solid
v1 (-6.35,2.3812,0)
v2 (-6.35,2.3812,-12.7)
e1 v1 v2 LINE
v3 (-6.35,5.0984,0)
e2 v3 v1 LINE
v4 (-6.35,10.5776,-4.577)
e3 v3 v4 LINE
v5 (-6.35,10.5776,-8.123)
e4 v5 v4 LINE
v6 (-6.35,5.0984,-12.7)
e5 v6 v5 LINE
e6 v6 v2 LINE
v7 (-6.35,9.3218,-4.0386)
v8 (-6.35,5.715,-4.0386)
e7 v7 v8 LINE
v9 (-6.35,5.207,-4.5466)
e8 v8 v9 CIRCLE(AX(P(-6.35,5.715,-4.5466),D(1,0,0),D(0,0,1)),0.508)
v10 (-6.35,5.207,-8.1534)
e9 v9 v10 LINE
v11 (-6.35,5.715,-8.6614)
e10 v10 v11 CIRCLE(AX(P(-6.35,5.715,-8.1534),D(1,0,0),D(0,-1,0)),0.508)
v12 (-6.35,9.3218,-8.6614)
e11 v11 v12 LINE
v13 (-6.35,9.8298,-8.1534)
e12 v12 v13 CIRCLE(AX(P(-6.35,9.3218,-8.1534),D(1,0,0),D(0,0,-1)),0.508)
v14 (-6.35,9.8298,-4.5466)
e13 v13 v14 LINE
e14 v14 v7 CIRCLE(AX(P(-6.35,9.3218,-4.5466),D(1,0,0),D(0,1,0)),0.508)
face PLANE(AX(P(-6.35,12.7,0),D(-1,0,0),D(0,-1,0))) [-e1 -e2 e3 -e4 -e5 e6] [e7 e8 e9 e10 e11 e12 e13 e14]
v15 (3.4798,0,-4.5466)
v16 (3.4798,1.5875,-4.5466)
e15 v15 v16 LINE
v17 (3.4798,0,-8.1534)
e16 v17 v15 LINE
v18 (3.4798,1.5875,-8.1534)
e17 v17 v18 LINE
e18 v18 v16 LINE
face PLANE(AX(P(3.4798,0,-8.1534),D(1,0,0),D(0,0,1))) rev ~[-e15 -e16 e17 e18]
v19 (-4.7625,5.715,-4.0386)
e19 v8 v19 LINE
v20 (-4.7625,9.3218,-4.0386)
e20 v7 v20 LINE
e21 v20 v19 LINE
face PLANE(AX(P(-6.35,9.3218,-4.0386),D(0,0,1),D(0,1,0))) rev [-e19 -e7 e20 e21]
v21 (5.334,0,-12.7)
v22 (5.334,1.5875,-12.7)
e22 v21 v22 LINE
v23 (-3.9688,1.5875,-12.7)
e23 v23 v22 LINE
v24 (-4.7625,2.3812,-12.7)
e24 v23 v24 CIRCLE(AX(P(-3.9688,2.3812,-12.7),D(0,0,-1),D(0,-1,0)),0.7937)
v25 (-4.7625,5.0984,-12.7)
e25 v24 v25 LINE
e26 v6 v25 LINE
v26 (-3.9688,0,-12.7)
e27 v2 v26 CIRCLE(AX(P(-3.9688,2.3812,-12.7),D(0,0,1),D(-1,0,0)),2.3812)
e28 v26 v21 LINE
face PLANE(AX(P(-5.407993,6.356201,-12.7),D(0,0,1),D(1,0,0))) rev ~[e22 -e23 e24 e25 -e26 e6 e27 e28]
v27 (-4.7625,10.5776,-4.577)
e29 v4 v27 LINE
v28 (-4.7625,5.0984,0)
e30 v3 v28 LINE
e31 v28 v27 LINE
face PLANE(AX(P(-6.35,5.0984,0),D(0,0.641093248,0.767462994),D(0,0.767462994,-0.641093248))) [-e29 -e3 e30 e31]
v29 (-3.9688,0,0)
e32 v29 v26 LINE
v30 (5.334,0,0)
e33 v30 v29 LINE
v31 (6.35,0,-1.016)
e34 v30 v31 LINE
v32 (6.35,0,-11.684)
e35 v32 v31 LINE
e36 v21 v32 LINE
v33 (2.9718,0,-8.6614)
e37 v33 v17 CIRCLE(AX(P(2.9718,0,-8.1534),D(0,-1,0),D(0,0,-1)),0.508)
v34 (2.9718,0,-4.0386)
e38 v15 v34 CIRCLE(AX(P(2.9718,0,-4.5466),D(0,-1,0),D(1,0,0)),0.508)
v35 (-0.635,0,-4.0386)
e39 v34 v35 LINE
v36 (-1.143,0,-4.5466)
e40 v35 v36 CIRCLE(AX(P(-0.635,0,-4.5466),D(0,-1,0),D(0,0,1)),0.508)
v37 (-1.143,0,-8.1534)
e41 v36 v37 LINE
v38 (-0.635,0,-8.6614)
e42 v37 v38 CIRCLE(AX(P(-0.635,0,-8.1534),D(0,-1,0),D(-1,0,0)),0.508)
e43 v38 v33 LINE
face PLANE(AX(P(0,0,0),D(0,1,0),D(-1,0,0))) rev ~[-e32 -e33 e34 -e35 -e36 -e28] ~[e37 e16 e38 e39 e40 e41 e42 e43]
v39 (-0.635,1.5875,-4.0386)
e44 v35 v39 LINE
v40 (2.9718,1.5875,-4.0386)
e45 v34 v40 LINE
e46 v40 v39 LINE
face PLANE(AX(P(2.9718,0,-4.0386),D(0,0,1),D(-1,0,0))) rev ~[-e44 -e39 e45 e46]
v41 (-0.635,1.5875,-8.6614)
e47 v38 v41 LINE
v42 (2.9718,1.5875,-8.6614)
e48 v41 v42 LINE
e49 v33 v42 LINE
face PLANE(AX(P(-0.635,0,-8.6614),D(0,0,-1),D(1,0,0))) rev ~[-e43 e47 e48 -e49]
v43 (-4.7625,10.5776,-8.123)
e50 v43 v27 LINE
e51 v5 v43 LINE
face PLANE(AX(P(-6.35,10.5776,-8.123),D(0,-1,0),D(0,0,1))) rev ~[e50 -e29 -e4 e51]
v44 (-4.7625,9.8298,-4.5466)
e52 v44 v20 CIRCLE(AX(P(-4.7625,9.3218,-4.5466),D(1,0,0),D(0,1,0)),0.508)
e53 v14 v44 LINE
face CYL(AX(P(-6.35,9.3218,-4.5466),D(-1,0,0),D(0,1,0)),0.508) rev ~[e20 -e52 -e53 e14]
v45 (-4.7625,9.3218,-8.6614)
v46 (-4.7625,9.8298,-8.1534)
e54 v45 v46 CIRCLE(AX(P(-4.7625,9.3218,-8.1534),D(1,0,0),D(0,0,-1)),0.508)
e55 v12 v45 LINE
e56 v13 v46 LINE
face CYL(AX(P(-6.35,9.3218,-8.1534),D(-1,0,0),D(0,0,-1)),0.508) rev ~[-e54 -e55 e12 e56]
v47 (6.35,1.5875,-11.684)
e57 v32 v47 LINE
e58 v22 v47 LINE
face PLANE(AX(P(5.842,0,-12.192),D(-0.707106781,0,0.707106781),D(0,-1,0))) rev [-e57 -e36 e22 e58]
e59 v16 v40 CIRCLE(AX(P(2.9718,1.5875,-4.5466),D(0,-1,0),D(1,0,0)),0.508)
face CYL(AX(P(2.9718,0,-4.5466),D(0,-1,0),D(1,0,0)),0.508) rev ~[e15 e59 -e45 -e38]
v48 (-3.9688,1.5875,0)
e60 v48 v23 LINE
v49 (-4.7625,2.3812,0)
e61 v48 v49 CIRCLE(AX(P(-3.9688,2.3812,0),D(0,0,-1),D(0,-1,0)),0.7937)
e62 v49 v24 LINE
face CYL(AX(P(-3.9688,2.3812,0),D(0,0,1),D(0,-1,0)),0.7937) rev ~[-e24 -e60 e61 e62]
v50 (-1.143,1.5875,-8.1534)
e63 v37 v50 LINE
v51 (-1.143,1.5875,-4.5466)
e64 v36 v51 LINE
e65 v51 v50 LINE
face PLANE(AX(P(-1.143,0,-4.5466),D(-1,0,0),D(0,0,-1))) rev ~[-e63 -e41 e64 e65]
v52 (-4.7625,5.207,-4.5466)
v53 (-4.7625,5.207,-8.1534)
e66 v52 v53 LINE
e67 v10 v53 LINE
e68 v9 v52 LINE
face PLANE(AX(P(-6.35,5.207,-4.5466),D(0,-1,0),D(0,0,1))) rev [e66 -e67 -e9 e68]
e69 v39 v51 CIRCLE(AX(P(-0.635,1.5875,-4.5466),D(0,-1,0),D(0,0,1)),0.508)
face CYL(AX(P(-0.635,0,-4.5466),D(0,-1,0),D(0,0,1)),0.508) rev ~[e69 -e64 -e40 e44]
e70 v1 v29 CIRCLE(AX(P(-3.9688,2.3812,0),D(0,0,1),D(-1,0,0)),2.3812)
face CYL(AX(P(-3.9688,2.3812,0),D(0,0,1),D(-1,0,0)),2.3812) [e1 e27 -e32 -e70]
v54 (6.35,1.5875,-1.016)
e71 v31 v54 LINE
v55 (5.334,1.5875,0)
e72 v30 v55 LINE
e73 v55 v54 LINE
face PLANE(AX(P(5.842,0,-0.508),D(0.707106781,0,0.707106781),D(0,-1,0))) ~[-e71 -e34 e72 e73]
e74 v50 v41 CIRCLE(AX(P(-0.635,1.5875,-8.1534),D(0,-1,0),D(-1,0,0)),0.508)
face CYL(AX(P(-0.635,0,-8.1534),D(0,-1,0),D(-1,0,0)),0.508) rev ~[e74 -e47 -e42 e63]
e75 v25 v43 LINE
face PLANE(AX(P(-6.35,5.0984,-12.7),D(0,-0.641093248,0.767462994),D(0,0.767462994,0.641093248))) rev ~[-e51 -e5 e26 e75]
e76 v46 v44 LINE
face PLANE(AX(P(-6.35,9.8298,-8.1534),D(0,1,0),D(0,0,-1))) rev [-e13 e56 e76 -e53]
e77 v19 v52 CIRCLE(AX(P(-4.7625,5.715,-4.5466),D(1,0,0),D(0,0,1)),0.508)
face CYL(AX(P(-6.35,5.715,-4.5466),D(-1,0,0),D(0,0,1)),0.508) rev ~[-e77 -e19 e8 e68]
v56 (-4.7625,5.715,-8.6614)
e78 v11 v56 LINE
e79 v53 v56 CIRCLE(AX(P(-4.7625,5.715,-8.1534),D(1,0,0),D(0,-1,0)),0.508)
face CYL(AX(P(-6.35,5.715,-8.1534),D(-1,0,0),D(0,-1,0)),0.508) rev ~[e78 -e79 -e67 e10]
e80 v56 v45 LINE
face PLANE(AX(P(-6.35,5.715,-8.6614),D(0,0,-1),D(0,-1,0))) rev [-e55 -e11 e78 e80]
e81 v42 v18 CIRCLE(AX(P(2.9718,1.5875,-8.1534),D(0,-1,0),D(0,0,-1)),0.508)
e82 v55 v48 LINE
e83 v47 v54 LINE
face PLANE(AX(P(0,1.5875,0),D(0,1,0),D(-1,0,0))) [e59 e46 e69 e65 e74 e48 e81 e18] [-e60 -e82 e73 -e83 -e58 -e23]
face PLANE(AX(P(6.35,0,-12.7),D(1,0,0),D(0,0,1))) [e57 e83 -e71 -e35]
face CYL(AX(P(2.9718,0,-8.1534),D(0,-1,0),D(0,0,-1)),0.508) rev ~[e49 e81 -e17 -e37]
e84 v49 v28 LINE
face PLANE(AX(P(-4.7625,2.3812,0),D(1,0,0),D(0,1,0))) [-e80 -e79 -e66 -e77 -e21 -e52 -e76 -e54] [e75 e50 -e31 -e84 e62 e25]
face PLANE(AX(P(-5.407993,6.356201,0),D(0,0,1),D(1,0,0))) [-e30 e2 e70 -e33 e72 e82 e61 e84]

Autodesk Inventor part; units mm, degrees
ref_plane "YZ Plane" through (0, 0, 0) normal (1, 0, 0) x (0, 1, 0)
ref_plane "XZ Plane" through (0, 0, 0) normal (0, 1, 0) x (-1, 0, 0)
sketch "Sketch1" plane through (0, 0, 0) normal (0, 1, 0) x (-1, 0, 0)
  line L0 (-6.35, 0) -> (6.35, 0)
  line L1 (6.35, 0) -> (6.35, -12.7)
  line L2 (6.35, -12.7) -> (-6.35, -12.7)
  line L3 (-6.35, -12.7) -> (-6.35, 0)
  line L4 (6.35, 0) -> (-6.35, -12.7) construction
  point P0 (0, 0)
  point P1 (0, 0)
  dimension "d0" = 12.7
  dimension "d1" = 12.7
extrude "Plate1" add sketch "Sketch1" along normal blind 1.5875
sketch "Sketch2" plane through (-4.7625, 0, 0) normal (-1, 0, 0) x (0, -1, 0)
  line L0 (0, -12.7) -> (0, 0)
  line L1 (0, 0) -> (-12.7, 0)
  line L2 (-12.7, 0) -> (-12.7, -12.7)
  line L3 (-12.7, -12.7) -> (0, -12.7)
edge flange "Flanges" height 12.7 angle 90 thickness 1.5875 bend radius 0.7937 thickness toward (-1, 0, 0) relief tear relief width 1.5875 relief depth 0.7937 edges at (-6.35, 1.5875, -6.35) wall of the first edge with corners at (-4.7625, 0, -12.7) (-4.7625, 0, 0) (-4.7625, 12.7, 0) (-4.7625, 12.7, -12.7)
bend "Bend1"
corner "Corner1"
sketch "Sketch8" plane through (0, 0, 0) normal (0, -1, 0) x (1, 0, 0)
  line L0 (6.35, 0) -> (-3.9687, 0) construction
  line L1 (2.9718, -4.0386) -> (-0.635, -4.0386)
  line L2 (-1.143, -4.5466) -> (-1.143, -8.1534)
  line L3 (-0.635, -8.6614) -> (2.9718, -8.6614)
  line L4 (3.4798, -8.1534) -> (3.4798, -4.5466)
  arc A0 (3.4798, -4.5466) -> (2.9718, -4.0386) centre (2.9718, -4.5466) ccw
  arc A1 (2.9718, -8.6614) -> (3.4798, -8.1534) centre (2.9718, -8.1534) ccw
  arc A2 (-1.143, -8.1534) -> (-0.635, -8.6614) centre (-0.635, -8.1534) ccw
  arc A3 (-0.635, -4.0386) -> (-1.143, -4.5466) centre (-0.635, -4.5466) ccw
  line L5 (2.9718, -4.5466) -> (-0.635, -8.1534) construction
  line L6 (6.35, -12.7) -> (6.35, 0) construction
  point P0 (0, 0)
  point P1 (-1.143, -8.6614)
  point P2 (3.4798, -8.6614)
  point P3 (12.7, 0)
  point P4 (1.1684, -6.35)
  dimension "d49" = 4.6228
  dimension "d50" = 0.508
  dimension "d52" = 6.35
  dimension "d123" = 5.1816
extrude "Body Stamp" cut sketch "Sketch8" against normal blind 1.5875
sketch "Sketch9" plane through (0, 0, 0) normal (0, -1, 0) x (1, 0, 0)
  arc A0 (3.4798, -4.5466) -> (2.9718, -4.0386) centre (2.9718, -4.5466) ccw construction
  arc A1 (-1.143, -8.1534) -> (-0.635, -8.6614) centre (-0.635, -8.1534) ccw construction
  line L0 (2.9718, -4.5466) -> (-0.635, -8.1534) construction
  circle A2 centre (1.1684, -6.35) radius 2.1844
  point P0 (0, 0)
  dimension "d55" = 4.3688
surface extrude "Body Circle" sketch "Sketch9" against normal up to surface (1.5875 mm away) shown yes curves A2
pattern_sketch "Body Pattern" of "Body Stamp", "Body Circle" from (1.1684, 0, -6.35) copies at (1.1684, 0, -19.05) at (1.1684, 0, -31.75) at (1.1684, 0, -44.45) at (1.1684, 0, -57.15) at (1.1684, 0, -69.85) at (1.1684, 0, -82.55) at (1.1684, 0, -95.25) at (1.1684, 0, -107.95) at (1.1684, 0, -120.65) at (1.1684, 0, -133.35) at (1.1684, 0, -146.05) at (1.1684, 0, -158.75) at (1.1684, 0, -171.45) at (1.1684, 0, -184.15) at (1.1684, 0, -196.85) at (1.1684, 0, -209.55) at (1.1684, 0, -222.25) at (1.1684, 0, -234.95) at (1.1684, 0, -247.65) at (1.1684, 0, -260.35) at (1.1684, 0, -273.05) at (1.1684, 0, -285.75) at (1.1684, 0, -298.45) at (1.1684, 0, -311.15) at (1.1684, 0, -323.85) at (1.1684, 0, -336.55) at (1.1684, 0, -349.25) at (1.1684, 0, -361.95) at (1.1684, 0, -374.65) at (1.1684, 0, -387.35) at (1.1684, 0, -400.05) at (1.1684, 0, -412.75) at (1.1684, 0, -425.45) at (1.1684, 0, -438.15)
sketch "Arc Length" plane through (19.05, 2.3812, 0) normal (0, 0, 1) x (1, 0, 0)
  line L0 (-25.4, 0) -> (-23.8125, 0) projected
  arc A0 (-25.4, 0) -> (-23.0187, -2.3813) centre (-23.0187, 0) ccw projected
  line L1 (-23.0187, -0.7938) -> (-23.0187, -2.3813) projected
  arc A1 (-23.8125, 0) -> (-23.0187, -0.7938) centre (-23.0187, 0) ccw projected
  point P0 (-19.05, -2.3812)
  dimension "d126" = 1.2468
  dimension "d127" = 3.7405
sketch "Sketch13" plane through (-6.35, 0, 431.8) normal (1, 0, 0) x (0, 0, -1)
  line L0 (493.268, 12.7) -> (495.3, 10.668)
  line L1 (495.3, 10.668) -> (497.332, 12.7)
  line L2 (493.268, 12.7) -> (497.332, 12.7)
  line L3 (495.3, 3.3973) -> (493.0372, 1.1344)
  line L4 (493.0372, 1.1344) -> (495.3, -1.1284)
  line L5 (495.3, -1.1284) -> (497.5628, 1.1344)
  line L6 (497.5628, 1.1344) -> (495.3, 3.3973)
  line L7 (495.3, 3.3973) -> (495.3, -1.1284) construction
  line L8 (495.3, 10.668) -> (495.3, 3.3973) construction
  line L9 (444.5, 12.7) -> (431.8, 12.7) projected
  line L10 (444.5, 2.3813) -> (431.8, 2.3813) construction
  line L11 (431.8, 12.7) -> (431.8, 2.3813) construction
  point P0 (444.5, -11.9062)
  point P1 (431.8, 0)
  dimension "d86" = 4.5256
  dimension "d128" = 2.032
  dimension "d129" = 1.016
  dimension "d130" = 63.5
feature "Notch" [suppressed]
pattern_linear "Notch Pattern" [suppressed]
ref_plane "Diagonal Plane" through (-4.7625, 1.5875, 0) normal (-0.7071068, 0.7071068, 0) x (0, 0, 1)
mirror "Everything Mirrored" about plane through (-4.7625, 1.5875, 0) normal (-0.7071068, 0.7071068, 0) of "Body Stamp", "Body Circle", "Body Pattern"
chamfer "End Chamfer" distance 1.016 angle 45 4 edges at (-5.5562, 12.7, -12.7) (-5.5562, 12.7, 0) (6.35, 0.7937, 0) (6.35, 0.7937, -12.7)
sketch "Sketch17" plane through (-6.35, 2.3813, -12.7) normal (-1, 0, 0) x (0, 0, 1)
  line L0 (12.7, 9.3028) -> (12.7, 0) construction
  line L1 (0, 0) -> (0, 9.3027) construction
  line L2 (1.016, 10.3187) -> (11.684, 10.3188) construction
  line L3 (0, 2.7171) -> (4.577, 8.1963)
  line L4 (6.35, 1.587) -> (6.35, 9.3027) construction
  line L5 (12.7, 2.7171) -> (8.123, 8.1963)
  line L6 (4.577, 8.1963) -> (8.123, 8.1963)
  line L7 (0, 2.7171) -> (0, 10.3187)
  line L8 (0, 10.3187) -> (12.7, 10.3187)
  line L9 (12.7, 10.3187) -> (12.7, 2.7171)
  point P0 (12.7, -2.3812)
extrude "Extrusion2" cut sketch "Sketch17" against normal blind 1.5875
sketch "Body Pattern Sketch" plane through (0, 0, 0) normal (0, -1, 0) x (1, 0, 0)
  line L0 (1.1684, -6.35) -> (1.1684, 0) construction
  circle A0 centre (1.1684, -6.35) radius 2.1844 construction
  point P0 (1.1684, -19.05)
  point P1 (1.1684, -31.75)
  point P2 (1.1684, -44.45)
  point P3 (1.1684, -57.15)
  point P4 (1.1684, -69.85)
  point P5 (1.1684, -82.55)
  point P6 (1.1684, -95.25)
  point P7 (1.1684, -107.95)
  point P8 (1.1684, -120.65)
  point P9 (1.1684, -133.35)
  point P10 (1.1684, -146.05)
  point P11 (1.1684, -158.75)
  point P12 (1.1684, -171.45)
  point P13 (1.1684, -184.15)
  point P14 (1.1684, -196.85)
  point P15 (1.1684, -209.55)
  point P16 (1.1684, -222.25)
  point P17 (1.1684, -234.95)
  point P18 (1.1684, -247.65)
  point P19 (1.1684, -260.35)
  point P20 (1.1684, -273.05)
  point P21 (1.1684, -285.75)
  point P22 (1.1684, -298.45)
  point P23 (1.1684, -311.15)
  point P24 (1.1684, -323.85)
  point P25 (1.1684, -336.55)
  point P26 (1.1684, -349.25)
  point P27 (1.1684, -361.95)
  point P28 (1.1684, -374.65)
  point P29 (1.1684, -387.35)
  point P30 (1.1684, -400.05)
  point P31 (1.1684, -412.75)
  point P32 (1.1684, -425.45)
  point P33 (1.1684, -438.15)
  dimension "d133" = 12.7
equation "\"d1\" = 12.7 * Length"
equation "\"d53\" = Thickness"
equation "\"d89\" = Thickness"
equation "\"d2\" = Thickness"
equation "\"d3\" = BendReliefWidth"
equation "\"d4\" = BendReliefDepth"
equation "\"d5\" = MinimumRemnant"
equation "\"d6\" = TransitionRadius"
equation "\"d10\" = CornerReliefSize"
equation "\"d11\" = GapSize"
equation "\"d12\" = JacobiRadiusSize"
equation "\"BendRadius\" = Thickness"
equation "\"BendReliefWidth\" = Thickness"
equation "\"BendReliefDepth\" = 0.5 * Thickness"
equation "\"CornerReliefSize\" = 4 * Thickness"
equation "\"MinimumRemnant\" = 2 * Thickness"
equation "\"TransitionRadius\" = BendRadius"
equation "\"JacobiRadiusSize\" = BendRadius"
equation "\"GapSize\" = Thickness"
equation "\"Length\" = 1"
equation "\"Thickness\" = 1.5875"
properties part number "Alu C 1x2x1x35"
